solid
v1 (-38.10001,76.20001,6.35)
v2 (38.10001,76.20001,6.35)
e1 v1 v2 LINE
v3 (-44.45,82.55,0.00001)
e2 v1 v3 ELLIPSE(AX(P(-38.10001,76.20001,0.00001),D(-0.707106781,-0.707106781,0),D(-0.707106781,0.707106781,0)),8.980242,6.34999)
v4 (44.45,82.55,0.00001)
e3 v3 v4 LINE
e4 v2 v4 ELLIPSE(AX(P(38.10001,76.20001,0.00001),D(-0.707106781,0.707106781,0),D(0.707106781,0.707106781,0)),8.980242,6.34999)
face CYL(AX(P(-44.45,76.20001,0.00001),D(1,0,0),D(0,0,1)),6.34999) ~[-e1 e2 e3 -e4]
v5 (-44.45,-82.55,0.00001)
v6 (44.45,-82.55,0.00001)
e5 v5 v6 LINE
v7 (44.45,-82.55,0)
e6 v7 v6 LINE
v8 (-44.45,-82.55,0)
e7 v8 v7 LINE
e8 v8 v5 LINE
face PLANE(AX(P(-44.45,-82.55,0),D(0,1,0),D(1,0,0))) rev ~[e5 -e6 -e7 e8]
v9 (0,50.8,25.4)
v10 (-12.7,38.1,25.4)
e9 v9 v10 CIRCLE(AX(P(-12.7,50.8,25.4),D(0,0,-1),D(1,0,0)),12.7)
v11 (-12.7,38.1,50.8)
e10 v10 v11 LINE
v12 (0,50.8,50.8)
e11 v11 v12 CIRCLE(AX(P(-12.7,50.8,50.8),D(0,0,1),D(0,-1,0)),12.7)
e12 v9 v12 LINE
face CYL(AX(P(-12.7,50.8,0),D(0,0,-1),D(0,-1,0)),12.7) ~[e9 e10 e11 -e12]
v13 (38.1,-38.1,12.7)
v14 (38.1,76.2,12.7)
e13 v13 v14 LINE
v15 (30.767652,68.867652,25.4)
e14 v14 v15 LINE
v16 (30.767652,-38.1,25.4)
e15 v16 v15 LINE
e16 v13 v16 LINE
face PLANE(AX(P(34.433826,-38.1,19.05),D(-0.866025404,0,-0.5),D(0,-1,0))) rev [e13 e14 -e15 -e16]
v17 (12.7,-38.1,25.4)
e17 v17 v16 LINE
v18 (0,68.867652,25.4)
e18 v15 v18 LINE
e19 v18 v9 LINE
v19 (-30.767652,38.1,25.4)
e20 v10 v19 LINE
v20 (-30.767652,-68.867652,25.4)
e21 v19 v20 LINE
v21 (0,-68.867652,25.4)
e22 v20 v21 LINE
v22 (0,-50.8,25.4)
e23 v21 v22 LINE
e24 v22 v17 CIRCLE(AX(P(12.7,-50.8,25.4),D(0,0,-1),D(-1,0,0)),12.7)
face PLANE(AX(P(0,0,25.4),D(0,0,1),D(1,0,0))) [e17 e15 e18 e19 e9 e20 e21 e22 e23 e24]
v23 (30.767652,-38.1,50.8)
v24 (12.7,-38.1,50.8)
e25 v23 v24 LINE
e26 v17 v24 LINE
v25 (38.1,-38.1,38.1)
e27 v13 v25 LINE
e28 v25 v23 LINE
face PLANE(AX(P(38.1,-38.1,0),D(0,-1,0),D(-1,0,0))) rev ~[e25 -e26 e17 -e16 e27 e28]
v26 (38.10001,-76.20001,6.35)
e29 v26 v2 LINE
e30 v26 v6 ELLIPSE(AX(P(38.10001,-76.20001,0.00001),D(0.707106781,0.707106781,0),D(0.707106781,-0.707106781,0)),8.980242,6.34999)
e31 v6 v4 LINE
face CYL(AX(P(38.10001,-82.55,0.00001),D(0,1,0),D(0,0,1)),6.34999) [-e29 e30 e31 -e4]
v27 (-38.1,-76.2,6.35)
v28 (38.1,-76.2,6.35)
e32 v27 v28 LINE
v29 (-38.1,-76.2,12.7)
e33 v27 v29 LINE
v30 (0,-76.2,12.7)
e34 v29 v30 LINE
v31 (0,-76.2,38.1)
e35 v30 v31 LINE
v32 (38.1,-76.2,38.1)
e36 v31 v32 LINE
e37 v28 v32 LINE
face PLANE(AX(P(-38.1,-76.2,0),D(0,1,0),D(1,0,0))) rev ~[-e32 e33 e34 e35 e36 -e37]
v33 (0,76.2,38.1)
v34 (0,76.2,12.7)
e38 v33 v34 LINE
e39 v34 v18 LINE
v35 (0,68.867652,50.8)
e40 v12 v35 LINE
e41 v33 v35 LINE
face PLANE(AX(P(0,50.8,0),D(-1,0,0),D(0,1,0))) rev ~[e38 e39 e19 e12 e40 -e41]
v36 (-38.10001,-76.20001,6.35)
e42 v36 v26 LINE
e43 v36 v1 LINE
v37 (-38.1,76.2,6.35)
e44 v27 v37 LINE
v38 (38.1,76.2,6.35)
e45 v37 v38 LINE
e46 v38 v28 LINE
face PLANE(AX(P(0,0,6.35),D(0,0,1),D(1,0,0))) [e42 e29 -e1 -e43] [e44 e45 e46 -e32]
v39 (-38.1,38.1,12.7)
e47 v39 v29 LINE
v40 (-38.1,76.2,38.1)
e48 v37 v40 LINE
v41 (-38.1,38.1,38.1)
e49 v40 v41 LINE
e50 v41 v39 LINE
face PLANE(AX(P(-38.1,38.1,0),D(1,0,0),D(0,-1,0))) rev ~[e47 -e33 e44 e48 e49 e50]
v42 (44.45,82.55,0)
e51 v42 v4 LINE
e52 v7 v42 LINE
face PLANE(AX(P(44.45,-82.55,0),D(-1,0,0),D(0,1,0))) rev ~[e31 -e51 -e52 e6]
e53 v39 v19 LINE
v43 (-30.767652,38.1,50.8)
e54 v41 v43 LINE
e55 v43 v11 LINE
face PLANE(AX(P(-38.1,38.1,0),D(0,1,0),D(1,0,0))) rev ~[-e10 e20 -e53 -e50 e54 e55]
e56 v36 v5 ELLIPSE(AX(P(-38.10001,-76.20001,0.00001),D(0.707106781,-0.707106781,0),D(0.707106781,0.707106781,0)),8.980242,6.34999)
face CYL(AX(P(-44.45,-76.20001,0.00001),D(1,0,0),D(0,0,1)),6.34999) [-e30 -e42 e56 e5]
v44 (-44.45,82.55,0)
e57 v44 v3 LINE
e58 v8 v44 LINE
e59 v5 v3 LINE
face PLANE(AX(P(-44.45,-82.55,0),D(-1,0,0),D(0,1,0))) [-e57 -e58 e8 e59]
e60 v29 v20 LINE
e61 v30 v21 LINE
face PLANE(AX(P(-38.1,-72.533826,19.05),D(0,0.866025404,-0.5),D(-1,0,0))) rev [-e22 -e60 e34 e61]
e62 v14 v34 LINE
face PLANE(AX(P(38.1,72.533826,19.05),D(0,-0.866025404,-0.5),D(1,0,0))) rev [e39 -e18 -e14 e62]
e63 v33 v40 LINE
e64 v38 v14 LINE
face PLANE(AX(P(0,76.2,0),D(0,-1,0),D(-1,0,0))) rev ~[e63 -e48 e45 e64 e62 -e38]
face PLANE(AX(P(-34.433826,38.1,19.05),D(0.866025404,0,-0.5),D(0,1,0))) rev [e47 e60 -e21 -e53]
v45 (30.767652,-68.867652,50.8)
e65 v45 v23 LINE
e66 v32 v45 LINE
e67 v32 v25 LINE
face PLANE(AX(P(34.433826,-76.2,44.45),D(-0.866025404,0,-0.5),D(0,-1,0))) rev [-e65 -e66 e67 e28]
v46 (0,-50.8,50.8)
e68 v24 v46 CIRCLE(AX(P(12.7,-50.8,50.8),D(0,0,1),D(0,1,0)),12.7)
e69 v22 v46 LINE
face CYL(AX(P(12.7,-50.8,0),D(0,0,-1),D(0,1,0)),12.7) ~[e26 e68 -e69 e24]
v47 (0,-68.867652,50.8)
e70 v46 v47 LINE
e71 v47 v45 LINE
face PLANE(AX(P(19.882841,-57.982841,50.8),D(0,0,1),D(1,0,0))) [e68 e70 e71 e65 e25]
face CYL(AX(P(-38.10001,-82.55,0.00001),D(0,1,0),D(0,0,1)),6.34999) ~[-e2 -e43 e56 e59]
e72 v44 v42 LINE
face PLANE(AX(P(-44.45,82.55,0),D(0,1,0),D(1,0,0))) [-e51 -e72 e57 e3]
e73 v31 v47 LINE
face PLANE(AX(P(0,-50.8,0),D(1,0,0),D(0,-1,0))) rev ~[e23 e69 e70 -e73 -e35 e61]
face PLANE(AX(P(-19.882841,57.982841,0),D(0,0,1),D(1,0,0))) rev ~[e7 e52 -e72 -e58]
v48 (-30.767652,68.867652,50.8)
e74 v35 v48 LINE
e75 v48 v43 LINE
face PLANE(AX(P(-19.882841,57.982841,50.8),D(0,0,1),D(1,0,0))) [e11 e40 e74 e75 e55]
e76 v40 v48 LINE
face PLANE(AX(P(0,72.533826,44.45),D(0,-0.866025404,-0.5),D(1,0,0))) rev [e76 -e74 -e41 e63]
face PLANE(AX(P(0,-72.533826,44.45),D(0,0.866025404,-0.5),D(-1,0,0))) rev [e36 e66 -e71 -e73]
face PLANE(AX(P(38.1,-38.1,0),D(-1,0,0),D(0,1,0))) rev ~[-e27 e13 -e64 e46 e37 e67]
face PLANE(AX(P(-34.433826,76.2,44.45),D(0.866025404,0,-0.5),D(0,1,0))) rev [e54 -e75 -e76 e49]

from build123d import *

# Parameters (mm, degrees)
F0_W        = 88.9
F0_H        = 165.1
F1_DEPTH    = 6.35
F2_DEPTH    = 50.8
F3_DEPTH    = 25.4
F4_R        = 6.34999
F5_SIZE2    = 7.3323484187
F5_SIZE     = 12.7
F6_C1_SIZE2 = 7.3323484187
F6_C1_SIZE  = 12.7
F6_C2_SIZE2 = 7.3323484187
F6_C2_SIZE  = 12.7
F6_C3_SIZE2 = 7.3323484187
F6_C3_SIZE  = 12.7


# Not quite as in the source:
# - a fillet or chamfer is up to 0.001 mm smaller than in the source, because OpenCascade refuses the exact size


with BuildPart() as f1:
    # F0 (on Top) → F1 (new body)
    with BuildSketch(Plane.XY):
        Rectangle(F0_W, F0_H)
        Polygon((38.1, -38.1), (38.1, -76.2), (0, -76.2), (-38.1, -76.2), (-38.1, 38.1), (-38.1, 76.2), (0, 76.2), (38.1, 76.2), align=None, mode=Mode.SUBTRACT)
    extrude(amount=F1_DEPTH)

    # F0 (on Top) → F2 (join)
    with BuildSketch(Plane.XY):
        with BuildLine():
            Line((-38.1, 76.2), (-38.1, 38.1))
            Line((-38.1, 38.1), (-12.7, 38.1))
            ThreePointArc((-12.7, 38.1), (-3.7197438789, 41.8197438789), (0, 50.8))
            Line((0, 50.8), (0, 76.2))
            Line((0, 76.2), (-38.1, 76.2))
        make_face()
        with BuildLine():
            Line((0, -76.2), (38.1, -76.2))
            Line((38.1, -76.2), (38.1, -38.1))
            Line((38.1, -38.1), (12.7, -38.1))
            ThreePointArc((12.7, -38.1), (3.7197438789, -41.8197438789), (0, -50.8))
            Line((0, -50.8), (0, -76.2))
        make_face()
    extrude(amount=F2_DEPTH)

    # F0 (on Top) → F3 (join)
    with BuildSketch(Plane.XY):
        with BuildLine():
            Line((-38.1, -76.2), (0, -76.2))
            Line((0, -76.2), (0, -50.8))
            ThreePointArc((0, -50.8), (3.7197438789, -41.8197438789), (12.7, -38.1))
            Line((12.7, -38.1), (38.1, -38.1))
            Line((38.1, -38.1), (38.1, 76.2))
            Line((38.1, 76.2), (0, 76.2))
            Line((0, 76.2), (0, 50.8))
            ThreePointArc((0, 50.8), (-3.7197438789, 41.8197438789), (-12.7, 38.1))
            Line((-12.7, 38.1), (-38.1, 38.1))
            Line((-38.1, 38.1), (-38.1, -76.2))
        make_face()
    extrude(amount=F3_DEPTH)

    # F4 (radius 6.35 in the source; OpenCascade refuses exactly that, so slightly less here)
    f4_edges = [f1.edges().sort_by_distance(p)[0] for p in [
        (0, -82.55, 6.35),
        (-44.45, 0, 6.35),
        (0, 82.55, 6.35),
        (44.45, 0, 6.35),
    ]]
    fillet(f4_edges, radius=F4_R)

    # F5
    f5_edges = [f1.edges().sort_by_distance(p)[0] for p in [
        (-19.05, 76.2, 50.8),
        (-38.1, 57.15, 50.8),
        (38.1, -57.15, 50.8),
        (38.1, 19.05, 25.4),
        (19.05, 76.2, 25.4),
    ]]
    chamfer(f5_edges, length=F5_SIZE, length2=F5_SIZE2)

    # F6: chamfer of 12.7 x 7.3323484187 on 3 edges, made by hand

    # F6_c1
    f6_c1_edges = [f1.edges().sort_by_distance(p)[0] for p in [
        (15.3838257906, -76.2, 50.8),
    ]]
    f6_c1_side = f1.faces().sort_by_distance((15.3838257906, -76.2, 50.6533530316))[0]
    chamfer(f6_c1_edges, length=F6_C1_SIZE, length2=F6_C1_SIZE2, reference=f6_c1_side)

    # F6_c2
    f6_c2_edges = [f1.edges().sort_by_distance(p)[0] for p in [
        (-19.05, -76.2, 25.4),
    ]]
    f6_c2_side = f1.faces().sort_by_distance((-19.05, -76.2, 25.2533530316))[0]
    chamfer(f6_c2_edges, length=F6_C2_SIZE, length2=F6_C2_SIZE2, reference=f6_c2_side)

    # F6_c3
    f6_c3_edges = [f1.edges().sort_by_distance(p)[0] for p in [
        (-38.1, -15.3838257906, 25.4),
    ]]
    f6_c3_side = f1.faces().sort_by_distance((-38.1, -15.3838257906, 25.2533530316))[0]
    chamfer(f6_c3_edges, length=F6_C3_SIZE, length2=F6_C3_SIZE2, reference=f6_c3_side)


solid = f1.part
